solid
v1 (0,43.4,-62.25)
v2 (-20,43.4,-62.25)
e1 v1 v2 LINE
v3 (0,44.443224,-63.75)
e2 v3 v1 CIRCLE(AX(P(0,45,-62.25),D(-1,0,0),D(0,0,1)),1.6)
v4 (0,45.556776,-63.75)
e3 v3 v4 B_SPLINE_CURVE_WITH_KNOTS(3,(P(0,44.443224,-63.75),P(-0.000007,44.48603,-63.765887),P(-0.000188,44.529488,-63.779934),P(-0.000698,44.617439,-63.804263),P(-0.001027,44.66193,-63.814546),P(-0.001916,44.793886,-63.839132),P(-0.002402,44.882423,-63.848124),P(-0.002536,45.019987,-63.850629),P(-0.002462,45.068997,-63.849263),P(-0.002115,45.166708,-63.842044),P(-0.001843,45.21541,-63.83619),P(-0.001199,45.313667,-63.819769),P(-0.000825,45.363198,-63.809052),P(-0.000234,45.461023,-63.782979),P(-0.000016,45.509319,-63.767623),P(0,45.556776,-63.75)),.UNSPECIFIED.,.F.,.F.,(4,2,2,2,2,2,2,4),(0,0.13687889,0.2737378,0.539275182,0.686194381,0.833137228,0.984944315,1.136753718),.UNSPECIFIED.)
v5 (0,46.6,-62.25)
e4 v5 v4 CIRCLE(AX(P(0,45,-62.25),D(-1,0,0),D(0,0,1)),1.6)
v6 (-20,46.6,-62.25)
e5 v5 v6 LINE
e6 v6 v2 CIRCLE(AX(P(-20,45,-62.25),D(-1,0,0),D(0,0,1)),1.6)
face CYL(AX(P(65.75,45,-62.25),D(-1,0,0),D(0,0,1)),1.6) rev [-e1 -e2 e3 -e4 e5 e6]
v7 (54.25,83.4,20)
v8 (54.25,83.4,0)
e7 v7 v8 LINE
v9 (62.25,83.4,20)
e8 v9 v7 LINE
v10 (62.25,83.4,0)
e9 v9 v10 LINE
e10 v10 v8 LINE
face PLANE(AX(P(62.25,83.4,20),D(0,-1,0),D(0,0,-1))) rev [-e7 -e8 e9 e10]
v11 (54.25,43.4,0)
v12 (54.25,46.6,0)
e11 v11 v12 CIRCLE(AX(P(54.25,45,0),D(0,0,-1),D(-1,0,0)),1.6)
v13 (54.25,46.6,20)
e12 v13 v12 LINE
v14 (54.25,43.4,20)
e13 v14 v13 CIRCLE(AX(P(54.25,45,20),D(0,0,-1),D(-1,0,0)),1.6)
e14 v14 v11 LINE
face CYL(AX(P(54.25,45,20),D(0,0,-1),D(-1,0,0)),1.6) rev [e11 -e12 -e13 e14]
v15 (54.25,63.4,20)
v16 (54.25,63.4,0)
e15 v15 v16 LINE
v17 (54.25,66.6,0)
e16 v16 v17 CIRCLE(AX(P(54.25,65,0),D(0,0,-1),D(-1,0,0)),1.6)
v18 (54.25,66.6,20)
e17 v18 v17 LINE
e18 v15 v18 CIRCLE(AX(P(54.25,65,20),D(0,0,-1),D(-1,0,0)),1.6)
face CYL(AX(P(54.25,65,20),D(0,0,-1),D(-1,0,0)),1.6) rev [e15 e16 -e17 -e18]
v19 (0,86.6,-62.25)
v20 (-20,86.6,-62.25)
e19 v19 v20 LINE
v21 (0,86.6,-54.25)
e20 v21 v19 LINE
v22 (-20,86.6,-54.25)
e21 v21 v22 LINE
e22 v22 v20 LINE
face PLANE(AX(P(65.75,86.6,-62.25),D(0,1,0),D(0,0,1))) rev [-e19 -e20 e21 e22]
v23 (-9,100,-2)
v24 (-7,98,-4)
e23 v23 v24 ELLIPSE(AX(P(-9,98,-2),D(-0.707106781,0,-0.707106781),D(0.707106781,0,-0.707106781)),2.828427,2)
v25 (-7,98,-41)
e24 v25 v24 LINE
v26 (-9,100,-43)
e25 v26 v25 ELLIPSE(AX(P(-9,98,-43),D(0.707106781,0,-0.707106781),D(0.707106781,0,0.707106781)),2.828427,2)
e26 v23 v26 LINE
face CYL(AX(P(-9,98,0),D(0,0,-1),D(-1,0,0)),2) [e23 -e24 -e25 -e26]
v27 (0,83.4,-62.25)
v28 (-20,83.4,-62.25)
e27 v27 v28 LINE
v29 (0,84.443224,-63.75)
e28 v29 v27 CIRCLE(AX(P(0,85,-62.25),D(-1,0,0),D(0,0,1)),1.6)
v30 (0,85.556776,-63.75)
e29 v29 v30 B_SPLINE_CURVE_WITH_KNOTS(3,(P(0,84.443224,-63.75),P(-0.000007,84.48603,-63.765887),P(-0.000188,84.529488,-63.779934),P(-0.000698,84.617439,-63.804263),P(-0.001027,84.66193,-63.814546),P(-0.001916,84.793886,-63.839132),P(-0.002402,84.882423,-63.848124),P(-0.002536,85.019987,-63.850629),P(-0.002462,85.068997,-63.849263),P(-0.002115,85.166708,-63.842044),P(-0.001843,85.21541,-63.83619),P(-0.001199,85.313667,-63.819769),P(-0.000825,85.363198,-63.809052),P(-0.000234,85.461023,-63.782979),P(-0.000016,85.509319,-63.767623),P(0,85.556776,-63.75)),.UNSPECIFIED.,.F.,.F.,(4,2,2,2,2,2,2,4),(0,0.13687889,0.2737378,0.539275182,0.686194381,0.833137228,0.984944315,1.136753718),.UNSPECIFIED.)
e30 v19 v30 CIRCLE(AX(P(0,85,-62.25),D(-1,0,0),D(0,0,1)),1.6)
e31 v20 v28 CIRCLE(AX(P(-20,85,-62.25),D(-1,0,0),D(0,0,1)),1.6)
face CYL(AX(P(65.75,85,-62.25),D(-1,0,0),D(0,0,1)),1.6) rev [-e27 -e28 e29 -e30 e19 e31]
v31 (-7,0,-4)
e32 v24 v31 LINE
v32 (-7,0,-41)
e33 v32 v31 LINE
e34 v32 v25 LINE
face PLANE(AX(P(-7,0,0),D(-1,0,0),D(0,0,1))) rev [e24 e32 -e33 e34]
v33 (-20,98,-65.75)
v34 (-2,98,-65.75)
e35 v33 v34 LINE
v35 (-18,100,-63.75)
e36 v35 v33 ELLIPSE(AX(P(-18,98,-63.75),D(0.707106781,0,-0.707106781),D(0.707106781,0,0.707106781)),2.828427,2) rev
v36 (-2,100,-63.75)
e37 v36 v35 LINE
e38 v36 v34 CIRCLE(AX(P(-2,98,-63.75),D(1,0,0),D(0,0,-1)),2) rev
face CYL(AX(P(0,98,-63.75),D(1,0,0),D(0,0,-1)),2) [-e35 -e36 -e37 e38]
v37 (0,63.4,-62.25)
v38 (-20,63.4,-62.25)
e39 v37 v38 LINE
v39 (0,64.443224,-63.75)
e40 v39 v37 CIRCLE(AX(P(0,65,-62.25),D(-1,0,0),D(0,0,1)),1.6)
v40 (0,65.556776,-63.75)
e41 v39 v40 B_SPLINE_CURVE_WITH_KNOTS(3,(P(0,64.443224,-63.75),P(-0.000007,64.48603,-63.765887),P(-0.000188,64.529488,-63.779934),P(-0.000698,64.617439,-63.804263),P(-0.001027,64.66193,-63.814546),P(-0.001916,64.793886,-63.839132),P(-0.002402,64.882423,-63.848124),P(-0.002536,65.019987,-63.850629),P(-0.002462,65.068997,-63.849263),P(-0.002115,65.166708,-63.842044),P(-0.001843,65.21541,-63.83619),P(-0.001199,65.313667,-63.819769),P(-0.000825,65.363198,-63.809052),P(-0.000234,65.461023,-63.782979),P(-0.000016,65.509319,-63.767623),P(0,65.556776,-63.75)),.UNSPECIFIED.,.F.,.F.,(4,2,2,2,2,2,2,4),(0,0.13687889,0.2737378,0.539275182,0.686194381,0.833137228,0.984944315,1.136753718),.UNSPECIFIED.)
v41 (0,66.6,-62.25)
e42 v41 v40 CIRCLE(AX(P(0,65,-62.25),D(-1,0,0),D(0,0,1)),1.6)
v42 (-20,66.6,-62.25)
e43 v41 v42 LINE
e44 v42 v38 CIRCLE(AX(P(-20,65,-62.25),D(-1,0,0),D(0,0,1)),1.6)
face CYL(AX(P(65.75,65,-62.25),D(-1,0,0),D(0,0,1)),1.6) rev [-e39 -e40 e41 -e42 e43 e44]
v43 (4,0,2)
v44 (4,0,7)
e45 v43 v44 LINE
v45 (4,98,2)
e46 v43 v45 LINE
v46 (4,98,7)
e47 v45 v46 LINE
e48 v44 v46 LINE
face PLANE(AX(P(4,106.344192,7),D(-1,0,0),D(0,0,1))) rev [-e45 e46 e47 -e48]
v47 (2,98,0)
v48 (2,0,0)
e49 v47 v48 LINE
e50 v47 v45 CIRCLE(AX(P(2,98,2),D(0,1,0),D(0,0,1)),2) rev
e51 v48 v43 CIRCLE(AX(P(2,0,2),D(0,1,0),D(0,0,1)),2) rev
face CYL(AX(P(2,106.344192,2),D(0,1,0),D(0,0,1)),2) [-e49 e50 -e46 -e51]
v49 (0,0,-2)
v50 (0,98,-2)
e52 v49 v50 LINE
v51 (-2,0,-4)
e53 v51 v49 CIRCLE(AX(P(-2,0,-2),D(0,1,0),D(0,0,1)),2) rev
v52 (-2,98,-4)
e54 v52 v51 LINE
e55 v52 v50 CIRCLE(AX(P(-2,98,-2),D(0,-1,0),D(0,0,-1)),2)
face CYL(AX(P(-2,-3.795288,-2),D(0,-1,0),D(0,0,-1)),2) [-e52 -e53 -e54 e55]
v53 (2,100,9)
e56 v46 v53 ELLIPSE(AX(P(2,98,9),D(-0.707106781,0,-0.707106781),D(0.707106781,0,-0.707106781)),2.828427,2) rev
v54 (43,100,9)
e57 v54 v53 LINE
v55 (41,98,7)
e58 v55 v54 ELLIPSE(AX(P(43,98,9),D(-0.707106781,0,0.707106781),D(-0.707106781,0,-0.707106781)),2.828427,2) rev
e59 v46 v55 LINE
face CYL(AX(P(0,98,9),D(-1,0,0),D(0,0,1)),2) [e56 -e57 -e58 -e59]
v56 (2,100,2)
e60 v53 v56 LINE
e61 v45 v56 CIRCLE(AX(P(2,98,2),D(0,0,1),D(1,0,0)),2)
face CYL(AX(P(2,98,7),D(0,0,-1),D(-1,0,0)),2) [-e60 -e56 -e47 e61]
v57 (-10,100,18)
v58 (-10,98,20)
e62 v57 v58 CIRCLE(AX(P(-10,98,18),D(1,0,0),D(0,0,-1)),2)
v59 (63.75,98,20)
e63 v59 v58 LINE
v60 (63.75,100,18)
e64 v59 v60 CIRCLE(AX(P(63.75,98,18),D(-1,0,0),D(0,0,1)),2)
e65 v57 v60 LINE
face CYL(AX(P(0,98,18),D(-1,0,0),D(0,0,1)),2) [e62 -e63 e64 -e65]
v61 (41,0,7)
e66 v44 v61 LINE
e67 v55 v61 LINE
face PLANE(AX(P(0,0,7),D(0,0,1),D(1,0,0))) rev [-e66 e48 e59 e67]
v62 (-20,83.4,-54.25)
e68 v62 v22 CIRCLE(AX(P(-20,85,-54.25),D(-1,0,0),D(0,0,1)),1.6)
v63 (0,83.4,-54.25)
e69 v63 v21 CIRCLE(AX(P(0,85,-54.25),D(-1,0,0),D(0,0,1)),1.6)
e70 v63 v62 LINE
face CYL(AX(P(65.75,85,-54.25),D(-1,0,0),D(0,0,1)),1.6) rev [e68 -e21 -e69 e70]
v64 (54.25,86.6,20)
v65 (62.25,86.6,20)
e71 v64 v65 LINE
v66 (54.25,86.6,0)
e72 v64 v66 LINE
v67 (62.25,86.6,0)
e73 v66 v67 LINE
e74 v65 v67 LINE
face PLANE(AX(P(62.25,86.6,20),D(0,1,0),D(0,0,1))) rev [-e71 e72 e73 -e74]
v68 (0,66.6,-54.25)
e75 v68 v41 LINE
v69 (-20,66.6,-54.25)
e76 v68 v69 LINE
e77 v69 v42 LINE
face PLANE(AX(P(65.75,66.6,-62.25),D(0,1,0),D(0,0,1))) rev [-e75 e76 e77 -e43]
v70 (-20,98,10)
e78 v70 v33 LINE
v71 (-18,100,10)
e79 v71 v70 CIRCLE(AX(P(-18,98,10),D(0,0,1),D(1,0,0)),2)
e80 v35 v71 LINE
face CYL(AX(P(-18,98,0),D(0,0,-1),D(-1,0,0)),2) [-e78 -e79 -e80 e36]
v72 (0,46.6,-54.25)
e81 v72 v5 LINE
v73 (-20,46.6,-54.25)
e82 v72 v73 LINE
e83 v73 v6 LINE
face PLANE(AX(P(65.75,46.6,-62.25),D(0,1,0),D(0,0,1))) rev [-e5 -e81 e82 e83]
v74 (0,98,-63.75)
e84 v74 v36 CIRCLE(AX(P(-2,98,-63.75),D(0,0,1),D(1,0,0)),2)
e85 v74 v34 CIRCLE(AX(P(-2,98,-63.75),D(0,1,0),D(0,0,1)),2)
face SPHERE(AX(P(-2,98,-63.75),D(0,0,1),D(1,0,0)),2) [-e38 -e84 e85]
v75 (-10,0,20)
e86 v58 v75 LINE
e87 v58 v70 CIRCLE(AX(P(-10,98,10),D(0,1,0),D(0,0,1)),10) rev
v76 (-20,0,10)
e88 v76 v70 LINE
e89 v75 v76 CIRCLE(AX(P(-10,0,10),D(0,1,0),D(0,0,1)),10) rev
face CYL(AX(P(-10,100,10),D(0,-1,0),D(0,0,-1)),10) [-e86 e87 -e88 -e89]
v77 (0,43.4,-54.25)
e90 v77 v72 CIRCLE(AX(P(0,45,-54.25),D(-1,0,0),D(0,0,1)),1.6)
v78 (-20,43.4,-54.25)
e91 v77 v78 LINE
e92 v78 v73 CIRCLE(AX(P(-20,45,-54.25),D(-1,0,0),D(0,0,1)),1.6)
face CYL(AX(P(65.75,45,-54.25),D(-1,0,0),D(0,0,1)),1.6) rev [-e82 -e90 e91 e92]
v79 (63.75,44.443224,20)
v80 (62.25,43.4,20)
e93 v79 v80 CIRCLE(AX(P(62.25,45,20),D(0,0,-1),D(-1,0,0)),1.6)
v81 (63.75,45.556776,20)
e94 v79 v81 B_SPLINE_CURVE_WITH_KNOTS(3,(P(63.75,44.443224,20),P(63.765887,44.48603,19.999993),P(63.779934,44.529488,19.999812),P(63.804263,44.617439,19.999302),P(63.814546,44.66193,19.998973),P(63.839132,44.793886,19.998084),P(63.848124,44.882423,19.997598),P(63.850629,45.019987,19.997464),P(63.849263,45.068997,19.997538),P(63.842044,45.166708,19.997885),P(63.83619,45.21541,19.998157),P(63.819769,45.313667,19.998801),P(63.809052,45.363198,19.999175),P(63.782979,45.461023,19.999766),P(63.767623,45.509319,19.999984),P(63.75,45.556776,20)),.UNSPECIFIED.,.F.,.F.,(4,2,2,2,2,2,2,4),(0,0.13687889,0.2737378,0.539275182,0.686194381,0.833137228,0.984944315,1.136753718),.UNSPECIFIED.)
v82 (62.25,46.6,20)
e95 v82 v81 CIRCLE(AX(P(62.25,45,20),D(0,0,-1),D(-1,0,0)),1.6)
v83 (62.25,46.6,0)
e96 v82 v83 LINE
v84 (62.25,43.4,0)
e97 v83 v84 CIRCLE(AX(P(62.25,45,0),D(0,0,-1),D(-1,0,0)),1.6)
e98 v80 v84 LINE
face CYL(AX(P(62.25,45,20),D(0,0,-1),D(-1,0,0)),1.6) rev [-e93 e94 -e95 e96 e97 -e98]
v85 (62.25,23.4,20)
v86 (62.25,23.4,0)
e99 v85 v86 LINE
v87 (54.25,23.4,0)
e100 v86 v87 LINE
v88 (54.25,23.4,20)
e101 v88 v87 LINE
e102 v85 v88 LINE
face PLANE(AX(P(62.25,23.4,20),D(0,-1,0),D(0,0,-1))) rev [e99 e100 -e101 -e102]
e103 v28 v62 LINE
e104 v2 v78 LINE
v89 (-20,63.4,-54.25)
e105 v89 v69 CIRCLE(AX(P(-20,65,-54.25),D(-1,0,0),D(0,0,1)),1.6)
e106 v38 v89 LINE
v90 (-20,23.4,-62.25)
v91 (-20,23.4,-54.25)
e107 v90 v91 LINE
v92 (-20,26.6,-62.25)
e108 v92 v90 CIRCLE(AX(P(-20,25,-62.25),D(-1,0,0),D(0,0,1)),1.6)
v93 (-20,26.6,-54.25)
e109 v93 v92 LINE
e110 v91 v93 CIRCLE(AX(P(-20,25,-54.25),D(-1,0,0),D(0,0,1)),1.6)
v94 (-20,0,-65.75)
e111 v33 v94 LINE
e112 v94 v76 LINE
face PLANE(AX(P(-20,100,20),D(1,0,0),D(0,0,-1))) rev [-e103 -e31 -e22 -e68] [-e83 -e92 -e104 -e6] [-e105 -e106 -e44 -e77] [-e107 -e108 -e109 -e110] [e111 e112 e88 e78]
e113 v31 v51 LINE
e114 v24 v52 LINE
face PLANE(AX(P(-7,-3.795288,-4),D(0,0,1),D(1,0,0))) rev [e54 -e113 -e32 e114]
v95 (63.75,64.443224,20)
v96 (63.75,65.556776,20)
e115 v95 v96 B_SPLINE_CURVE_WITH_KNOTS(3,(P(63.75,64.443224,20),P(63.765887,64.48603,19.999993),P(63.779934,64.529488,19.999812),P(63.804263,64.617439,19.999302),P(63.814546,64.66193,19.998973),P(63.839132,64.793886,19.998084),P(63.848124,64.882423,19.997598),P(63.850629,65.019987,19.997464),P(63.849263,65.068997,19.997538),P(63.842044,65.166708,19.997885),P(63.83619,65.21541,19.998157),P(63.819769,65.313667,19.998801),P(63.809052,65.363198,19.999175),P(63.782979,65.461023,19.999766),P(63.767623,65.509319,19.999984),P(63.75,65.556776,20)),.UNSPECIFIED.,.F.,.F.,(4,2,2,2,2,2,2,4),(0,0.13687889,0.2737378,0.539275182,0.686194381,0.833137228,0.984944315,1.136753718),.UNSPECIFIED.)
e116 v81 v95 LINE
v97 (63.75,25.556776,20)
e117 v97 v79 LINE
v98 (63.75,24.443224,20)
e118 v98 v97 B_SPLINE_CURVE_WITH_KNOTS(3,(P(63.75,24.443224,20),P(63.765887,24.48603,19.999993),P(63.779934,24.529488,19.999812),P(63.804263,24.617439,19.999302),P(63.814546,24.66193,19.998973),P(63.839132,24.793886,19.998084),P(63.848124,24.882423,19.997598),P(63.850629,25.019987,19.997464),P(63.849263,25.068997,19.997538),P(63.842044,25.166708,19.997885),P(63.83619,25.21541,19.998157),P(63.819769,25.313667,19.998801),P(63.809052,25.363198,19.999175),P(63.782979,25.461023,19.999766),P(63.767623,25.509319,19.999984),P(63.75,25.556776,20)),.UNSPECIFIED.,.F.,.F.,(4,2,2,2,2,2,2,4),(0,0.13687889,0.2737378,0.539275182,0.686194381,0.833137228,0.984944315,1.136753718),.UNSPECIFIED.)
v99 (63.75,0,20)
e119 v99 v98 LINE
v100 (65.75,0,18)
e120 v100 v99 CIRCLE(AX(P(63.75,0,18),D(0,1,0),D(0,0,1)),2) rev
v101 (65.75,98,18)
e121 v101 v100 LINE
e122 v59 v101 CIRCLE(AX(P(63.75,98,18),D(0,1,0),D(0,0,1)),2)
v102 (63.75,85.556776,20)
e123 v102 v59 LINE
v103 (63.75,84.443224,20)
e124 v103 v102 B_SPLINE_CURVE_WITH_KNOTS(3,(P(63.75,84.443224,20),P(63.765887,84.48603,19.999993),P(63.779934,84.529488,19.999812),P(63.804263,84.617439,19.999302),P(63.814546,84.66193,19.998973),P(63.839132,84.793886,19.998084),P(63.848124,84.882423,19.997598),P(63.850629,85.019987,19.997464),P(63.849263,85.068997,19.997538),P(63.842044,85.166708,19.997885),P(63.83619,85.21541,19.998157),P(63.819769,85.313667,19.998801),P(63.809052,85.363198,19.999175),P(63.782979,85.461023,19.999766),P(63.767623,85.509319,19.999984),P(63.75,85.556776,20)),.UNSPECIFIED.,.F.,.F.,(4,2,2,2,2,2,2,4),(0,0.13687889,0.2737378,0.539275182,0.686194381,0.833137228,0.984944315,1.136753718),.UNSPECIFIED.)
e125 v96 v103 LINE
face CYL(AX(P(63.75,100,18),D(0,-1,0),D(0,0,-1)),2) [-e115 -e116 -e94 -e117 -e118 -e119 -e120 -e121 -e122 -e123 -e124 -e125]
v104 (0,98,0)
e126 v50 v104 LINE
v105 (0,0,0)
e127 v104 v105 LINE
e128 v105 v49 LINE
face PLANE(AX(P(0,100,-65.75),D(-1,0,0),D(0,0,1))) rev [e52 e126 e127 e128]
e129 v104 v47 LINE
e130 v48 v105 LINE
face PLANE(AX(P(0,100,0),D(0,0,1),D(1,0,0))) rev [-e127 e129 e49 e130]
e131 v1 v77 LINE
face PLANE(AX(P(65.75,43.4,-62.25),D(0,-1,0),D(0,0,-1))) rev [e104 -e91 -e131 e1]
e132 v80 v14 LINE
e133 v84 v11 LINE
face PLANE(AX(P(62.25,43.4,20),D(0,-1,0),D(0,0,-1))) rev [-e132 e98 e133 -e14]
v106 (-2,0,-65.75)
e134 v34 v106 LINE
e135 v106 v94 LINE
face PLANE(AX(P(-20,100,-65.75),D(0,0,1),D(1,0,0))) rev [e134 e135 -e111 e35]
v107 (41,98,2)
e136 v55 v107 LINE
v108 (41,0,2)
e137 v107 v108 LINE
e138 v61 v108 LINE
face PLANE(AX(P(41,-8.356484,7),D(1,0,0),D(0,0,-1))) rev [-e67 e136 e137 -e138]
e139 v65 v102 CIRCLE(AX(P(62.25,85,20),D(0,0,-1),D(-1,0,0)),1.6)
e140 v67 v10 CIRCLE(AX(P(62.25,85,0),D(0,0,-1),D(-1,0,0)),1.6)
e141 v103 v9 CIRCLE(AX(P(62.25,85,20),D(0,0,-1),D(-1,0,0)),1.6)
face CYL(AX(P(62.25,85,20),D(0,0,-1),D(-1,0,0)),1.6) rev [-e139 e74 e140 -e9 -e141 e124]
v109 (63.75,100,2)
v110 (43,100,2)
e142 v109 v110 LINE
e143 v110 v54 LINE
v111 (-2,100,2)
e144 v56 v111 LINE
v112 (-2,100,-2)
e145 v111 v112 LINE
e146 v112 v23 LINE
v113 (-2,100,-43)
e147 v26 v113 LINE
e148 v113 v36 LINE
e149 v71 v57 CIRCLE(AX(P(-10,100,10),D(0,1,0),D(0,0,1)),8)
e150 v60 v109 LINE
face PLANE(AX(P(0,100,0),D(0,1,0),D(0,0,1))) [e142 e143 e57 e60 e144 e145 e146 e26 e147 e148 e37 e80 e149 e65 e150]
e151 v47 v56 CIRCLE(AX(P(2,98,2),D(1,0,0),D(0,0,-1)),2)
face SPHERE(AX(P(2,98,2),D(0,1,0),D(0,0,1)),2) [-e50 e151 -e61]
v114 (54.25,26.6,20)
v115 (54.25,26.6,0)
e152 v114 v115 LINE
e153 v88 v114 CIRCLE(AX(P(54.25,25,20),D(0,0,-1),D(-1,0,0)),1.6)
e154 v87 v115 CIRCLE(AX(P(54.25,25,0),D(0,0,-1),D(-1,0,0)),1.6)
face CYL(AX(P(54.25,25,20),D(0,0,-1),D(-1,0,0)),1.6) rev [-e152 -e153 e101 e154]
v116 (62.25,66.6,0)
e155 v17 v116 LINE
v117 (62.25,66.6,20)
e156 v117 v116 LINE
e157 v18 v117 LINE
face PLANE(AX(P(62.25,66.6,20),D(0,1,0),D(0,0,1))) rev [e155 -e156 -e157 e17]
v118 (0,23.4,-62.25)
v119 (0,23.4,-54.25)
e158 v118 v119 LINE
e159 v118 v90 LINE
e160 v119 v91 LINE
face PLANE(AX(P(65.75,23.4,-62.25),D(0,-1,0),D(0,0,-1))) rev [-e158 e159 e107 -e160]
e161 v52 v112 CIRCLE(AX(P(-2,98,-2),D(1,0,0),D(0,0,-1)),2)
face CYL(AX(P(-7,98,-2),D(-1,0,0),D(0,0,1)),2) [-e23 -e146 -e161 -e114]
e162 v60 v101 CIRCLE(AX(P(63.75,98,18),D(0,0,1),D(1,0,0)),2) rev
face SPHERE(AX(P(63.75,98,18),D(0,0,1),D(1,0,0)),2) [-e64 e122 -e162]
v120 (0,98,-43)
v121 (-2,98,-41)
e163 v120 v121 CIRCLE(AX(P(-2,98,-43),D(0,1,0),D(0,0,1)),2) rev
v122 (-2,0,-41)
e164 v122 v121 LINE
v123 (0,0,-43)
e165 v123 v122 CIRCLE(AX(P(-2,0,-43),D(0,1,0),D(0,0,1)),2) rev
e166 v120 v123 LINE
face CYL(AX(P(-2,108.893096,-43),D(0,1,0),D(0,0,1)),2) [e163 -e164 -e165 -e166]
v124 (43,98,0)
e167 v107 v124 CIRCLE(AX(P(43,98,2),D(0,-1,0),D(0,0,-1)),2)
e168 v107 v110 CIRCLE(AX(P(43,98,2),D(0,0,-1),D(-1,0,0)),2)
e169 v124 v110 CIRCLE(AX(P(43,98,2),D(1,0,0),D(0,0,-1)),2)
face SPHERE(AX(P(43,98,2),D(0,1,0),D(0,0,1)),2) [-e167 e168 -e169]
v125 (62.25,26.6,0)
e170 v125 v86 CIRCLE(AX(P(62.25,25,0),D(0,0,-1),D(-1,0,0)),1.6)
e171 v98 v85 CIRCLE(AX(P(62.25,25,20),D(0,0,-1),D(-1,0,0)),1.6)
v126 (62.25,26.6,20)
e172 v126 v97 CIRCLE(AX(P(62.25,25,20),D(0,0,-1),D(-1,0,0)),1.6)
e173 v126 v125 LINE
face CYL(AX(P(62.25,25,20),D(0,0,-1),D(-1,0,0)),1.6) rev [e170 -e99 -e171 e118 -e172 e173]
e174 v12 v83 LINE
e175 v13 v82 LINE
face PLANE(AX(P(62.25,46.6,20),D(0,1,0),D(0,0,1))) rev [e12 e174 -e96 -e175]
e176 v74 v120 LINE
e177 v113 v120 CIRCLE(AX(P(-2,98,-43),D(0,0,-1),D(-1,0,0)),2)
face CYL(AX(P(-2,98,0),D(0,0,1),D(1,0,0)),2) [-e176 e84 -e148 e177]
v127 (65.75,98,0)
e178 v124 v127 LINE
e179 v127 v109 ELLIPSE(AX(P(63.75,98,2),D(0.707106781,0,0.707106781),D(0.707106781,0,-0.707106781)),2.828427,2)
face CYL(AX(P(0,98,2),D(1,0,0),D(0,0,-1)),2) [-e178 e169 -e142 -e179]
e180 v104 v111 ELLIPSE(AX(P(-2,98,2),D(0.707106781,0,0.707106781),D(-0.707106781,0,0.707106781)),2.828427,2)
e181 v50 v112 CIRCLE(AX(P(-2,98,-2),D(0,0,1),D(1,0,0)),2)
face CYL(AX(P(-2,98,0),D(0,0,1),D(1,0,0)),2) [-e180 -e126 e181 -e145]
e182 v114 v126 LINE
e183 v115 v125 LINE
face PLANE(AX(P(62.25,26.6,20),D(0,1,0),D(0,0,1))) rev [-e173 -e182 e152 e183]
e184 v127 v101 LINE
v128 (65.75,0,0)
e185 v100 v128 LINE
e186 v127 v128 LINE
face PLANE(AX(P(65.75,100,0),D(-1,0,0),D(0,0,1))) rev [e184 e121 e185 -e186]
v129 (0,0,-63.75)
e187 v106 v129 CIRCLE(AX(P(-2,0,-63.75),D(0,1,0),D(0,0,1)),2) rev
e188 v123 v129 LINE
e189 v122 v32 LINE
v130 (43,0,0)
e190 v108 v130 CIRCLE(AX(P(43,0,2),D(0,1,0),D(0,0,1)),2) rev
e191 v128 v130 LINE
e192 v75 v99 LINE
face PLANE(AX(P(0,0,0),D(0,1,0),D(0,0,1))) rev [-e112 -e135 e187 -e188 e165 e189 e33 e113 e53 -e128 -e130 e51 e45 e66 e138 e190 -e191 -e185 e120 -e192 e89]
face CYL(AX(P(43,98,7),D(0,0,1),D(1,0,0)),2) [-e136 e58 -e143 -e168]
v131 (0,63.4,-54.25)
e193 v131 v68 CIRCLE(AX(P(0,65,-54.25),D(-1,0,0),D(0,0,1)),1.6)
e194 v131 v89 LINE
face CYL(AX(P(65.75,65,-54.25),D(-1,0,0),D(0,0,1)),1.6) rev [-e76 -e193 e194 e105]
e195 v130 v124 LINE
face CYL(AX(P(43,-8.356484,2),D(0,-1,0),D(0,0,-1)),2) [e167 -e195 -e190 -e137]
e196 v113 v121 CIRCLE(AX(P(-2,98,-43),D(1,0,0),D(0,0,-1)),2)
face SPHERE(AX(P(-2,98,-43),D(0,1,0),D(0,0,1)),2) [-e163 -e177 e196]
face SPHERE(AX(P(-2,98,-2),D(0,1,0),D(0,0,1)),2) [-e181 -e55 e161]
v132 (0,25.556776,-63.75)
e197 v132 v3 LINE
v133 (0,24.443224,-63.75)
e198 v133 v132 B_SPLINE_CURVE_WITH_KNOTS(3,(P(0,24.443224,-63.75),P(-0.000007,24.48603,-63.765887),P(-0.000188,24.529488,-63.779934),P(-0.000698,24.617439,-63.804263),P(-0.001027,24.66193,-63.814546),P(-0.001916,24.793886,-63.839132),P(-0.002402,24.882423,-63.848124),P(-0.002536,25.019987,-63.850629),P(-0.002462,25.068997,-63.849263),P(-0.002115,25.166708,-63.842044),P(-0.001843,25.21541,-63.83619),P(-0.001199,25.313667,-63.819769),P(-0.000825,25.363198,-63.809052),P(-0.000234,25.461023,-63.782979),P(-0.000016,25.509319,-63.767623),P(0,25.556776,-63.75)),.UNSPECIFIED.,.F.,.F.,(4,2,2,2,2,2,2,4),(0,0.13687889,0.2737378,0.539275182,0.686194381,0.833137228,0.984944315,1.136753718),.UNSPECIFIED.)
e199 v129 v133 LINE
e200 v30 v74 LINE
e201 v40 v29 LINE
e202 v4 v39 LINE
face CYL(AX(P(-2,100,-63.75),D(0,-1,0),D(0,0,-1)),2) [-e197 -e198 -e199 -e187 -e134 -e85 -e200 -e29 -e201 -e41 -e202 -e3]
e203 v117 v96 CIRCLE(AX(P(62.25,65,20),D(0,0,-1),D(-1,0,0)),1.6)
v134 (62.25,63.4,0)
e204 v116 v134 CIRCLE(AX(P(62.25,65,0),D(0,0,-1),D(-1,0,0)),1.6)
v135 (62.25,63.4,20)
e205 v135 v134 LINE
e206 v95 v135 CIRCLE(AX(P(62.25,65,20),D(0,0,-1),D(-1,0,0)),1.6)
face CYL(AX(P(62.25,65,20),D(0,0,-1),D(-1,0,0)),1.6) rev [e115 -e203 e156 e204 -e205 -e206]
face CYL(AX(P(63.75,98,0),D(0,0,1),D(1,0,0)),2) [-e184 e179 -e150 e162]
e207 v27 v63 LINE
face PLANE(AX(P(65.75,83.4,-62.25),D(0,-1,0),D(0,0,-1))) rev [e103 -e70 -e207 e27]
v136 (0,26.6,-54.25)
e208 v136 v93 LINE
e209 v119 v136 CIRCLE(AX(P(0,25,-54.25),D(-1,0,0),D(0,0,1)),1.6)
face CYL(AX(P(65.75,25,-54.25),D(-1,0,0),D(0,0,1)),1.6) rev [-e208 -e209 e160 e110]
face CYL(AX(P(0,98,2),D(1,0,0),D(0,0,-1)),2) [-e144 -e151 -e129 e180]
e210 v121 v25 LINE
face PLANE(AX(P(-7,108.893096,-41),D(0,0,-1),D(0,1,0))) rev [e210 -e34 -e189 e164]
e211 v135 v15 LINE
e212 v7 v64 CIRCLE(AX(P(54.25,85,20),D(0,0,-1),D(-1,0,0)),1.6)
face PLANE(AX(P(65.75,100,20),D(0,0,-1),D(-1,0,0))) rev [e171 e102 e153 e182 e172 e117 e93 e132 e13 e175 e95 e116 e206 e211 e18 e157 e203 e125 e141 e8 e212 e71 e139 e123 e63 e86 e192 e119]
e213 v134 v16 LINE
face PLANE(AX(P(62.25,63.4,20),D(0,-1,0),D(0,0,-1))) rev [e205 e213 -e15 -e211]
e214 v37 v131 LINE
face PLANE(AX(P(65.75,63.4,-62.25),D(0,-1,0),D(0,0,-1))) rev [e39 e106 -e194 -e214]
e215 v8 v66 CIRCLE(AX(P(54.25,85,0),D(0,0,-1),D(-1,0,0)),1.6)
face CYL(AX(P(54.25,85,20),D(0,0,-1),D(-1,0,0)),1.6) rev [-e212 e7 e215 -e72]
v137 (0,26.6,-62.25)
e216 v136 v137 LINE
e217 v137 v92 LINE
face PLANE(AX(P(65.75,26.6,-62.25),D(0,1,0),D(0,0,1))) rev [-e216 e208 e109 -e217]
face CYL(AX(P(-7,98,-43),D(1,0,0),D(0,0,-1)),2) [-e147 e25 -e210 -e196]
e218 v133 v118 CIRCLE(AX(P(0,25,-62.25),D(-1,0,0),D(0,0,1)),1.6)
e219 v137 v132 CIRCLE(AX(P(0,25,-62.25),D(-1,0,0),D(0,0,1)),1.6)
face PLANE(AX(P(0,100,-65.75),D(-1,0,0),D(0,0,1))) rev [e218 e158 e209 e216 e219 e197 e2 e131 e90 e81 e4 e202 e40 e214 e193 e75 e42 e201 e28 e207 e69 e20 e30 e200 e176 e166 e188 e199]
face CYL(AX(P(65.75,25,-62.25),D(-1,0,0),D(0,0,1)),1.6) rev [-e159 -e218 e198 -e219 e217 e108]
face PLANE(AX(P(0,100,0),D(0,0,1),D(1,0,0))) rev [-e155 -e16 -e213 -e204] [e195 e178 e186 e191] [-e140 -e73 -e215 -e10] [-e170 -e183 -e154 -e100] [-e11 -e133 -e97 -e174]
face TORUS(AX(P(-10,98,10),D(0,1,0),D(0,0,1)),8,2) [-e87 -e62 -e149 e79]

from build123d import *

# Parameters (mm, degrees)
BOSS_EXTRUDE1_DEPTH = 100
SKETCH2_W           = 37
SKETCH2_H           = 112.688383797
CUT_EXTRUDE1_DEPTH  = 7
SKETCH3_W           = 37
SKETCH3_H           = 114.700676364
CUT_EXTRUDE2_DEPTH  = 7
CUT_EXTRUDE3_DEPTH  = 148.228139294
CUT_EXTRUDE4_DEPTH  = 137.550814717
FILLET1_R           = 10
FILLET2_R           = 2
FILLET3_R           = 2
FILLET4_R           = 2


with BuildPart() as part:
    # Sketch1 → Boss-Extrude1 (new body)
    with BuildSketch(Plane(origin=(0, 0, 0), x_dir=(1, 0, 0), z_dir=(0, 1, 0))):
        Polygon((0, 0), (65.75, 0), (65.75, -20), (-20, -20), (-20, 65.75), (0, 65.75), align=None)
    extrude(amount=BOSS_EXTRUDE1_DEPTH)

    # Sketch2 → Cut-Extrude1 (cut)
    with BuildSketch(Plane(origin=(0, 0, 0), x_dir=(0, 0, -1), z_dir=(1, 0, 0))):
        with Locations((22.5, 52.54890392)):
            Rectangle(SKETCH2_W, SKETCH2_H)
    extrude(amount=-CUT_EXTRUDE1_DEPTH, mode=Mode.SUBTRACT)

    # Sketch3 → Cut-Extrude2 (cut)
    with BuildSketch(Plane(origin=(0, 0, 0), x_dir=(-1, 0, 0), z_dir=(0, 0, -1))):
        with Locations((-22.5, 48.993853716)):
            Rectangle(SKETCH3_W, SKETCH3_H)
    extrude(amount=-CUT_EXTRUDE2_DEPTH, mode=Mode.SUBTRACT)

    # Sketch4 → Cut-Extrude3 (cut, through all)
    with BuildSketch(Plane.ZY.offset(20)):
        with BuildLine():
            Line((-62.25, 86.6), (-54.25, 86.6))
            ThreePointArc((-54.25, 86.6), (-52.65, 85), (-54.25, 83.4))
            Line((-54.25, 83.4), (-62.25, 83.4))
            ThreePointArc((-62.25, 83.4), (-63.85, 85), (-62.25, 86.6))
        make_face()
        with BuildLine():
            Line((-62.25, 66.6), (-54.25, 66.6))
            ThreePointArc((-54.25, 66.6), (-52.65, 65), (-54.25, 63.4))
            Line((-54.25, 63.4), (-62.25, 63.4))
            ThreePointArc((-62.25, 63.4), (-63.85, 65), (-62.25, 66.6))
        make_face()
        with BuildLine():
            Line((-62.25, 46.6), (-54.25, 46.6))
            ThreePointArc((-54.25, 46.6), (-52.65, 45), (-54.25, 43.4))
            Line((-54.25, 43.4), (-62.25, 43.4))
            ThreePointArc((-62.25, 43.4), (-63.85, 45), (-62.25, 46.6))
        make_face()
        with BuildLine():
            Line((-62.25, 26.6), (-54.25, 26.6))
            ThreePointArc((-54.25, 26.6), (-52.65, 25), (-54.25, 23.4))
            Line((-54.25, 23.4), (-62.25, 23.4))
            ThreePointArc((-62.25, 23.4), (-63.85, 25), (-62.25, 26.6))
        make_face()
    extrude(amount=-CUT_EXTRUDE3_DEPTH, mode=Mode.SUBTRACT)

    # Sketch6 → Cut-Extrude4 (cut, through all)
    with BuildSketch(Plane(origin=(0, 0, 0), x_dir=(-1, 0, 0), z_dir=(0, 0, -1))):
        with BuildLine():
            Line((-62.25, 86.6), (-54.25, 86.6))
            ThreePointArc((-54.25, 86.6), (-52.65, 85), (-54.25, 83.4))
            Line((-54.25, 83.4), (-62.25, 83.4))
            ThreePointArc((-62.25, 83.4), (-63.85, 85), (-62.25, 86.6))
        make_face()
        with BuildLine():
            Line((-62.25, 66.6), (-54.25, 66.6))
            ThreePointArc((-54.25, 66.6), (-52.65, 65), (-54.25, 63.4))
            Line((-54.25, 63.4), (-62.25, 63.4))
            ThreePointArc((-62.25, 63.4), (-63.85, 65), (-62.25, 66.6))
        make_face()
        with BuildLine():
            Line((-62.25, 46.6), (-54.25, 46.6))
            ThreePointArc((-54.25, 46.6), (-52.65, 45), (-54.25, 43.4))
            Line((-54.25, 43.4), (-62.25, 43.4))
            ThreePointArc((-62.25, 43.4), (-63.85, 45), (-62.25, 46.6))
        make_face()
        with BuildLine():
            Line((-62.25, 26.6), (-54.25, 26.6))
            ThreePointArc((-54.25, 26.6), (-52.65, 25), (-54.25, 23.4))
            Line((-54.25, 23.4), (-62.25, 23.4))
            ThreePointArc((-62.25, 23.4), (-63.85, 25), (-62.25, 26.6))
        make_face()
    extrude(amount=-CUT_EXTRUDE4_DEPTH, mode=Mode.SUBTRACT)

    # Fillet1
    fillet1_edges = [part.edges().sort_by_distance(p)[0] for p in [
        (-20, 50, 20),
    ]]
    fillet(fillet1_edges, radius=FILLET1_R)

    # Fillet2
    fillet2_edges = [part.edges().sort_by_distance(p)[0] for p in [
        (0, 50, -41),
        (0, 50, -4),
        (4, 50, 0),
        (41, 50, 0),
    ]]
    fillet(fillet2_edges, radius=FILLET2_R)

    # Fillet3
    fillet3_edges = [part.edges().sort_by_distance(p)[0] for p in [
        (-20, 100, -27.875),
        (65.75, 100, 10),
        (27.875, 100, 20),
        (-17.071067812, 100, 17.071067812),
        (4, 100, 4.5),
        (1, 100, 0),
        (-4.5, 100, -41),
        (0, 100, -54.375),
        (-0.585786438, 100, -3.414213562),
        (-0.585786438, 100, -41.585786438),
        (3.414213562, 100, 0.585786438),
        (41.585786438, 100, 0.585786438),
        (54.375, 100, 0),
        (-4.5, 100, -4),
        (-7, 100, -22.5),
        (0, 100, -1),
        (41, 100, 4.5),
        (22.5, 100, 7),
        (-10, 100, -65.75),
    ]]
    fillet(fillet3_edges, radius=FILLET3_R)

    # Fillet4
    # the kernel refuses this fillet: 2 mm, written as the material it takes off along each edge
    with BuildSketch(Plane(origin=(-2, 98, -63.75), x_dir=(0, 0, -1), z_dir=(1, 0, 0))) as fillet4_piece_1_section:
        Polygon((0, 0), (FILLET4_R, 0), (FILLET4_R, FILLET4_R), (0, FILLET4_R), align=None)
    fillet4_piece_1 = extrude(amount=FILLET4_R, mode=Mode.PRIVATE)
    fillet4_piece_1 = fillet4_piece_1 - Plane(origin=(-2, 98, -63.75), x_dir=(0, -0.7071067811865475, 0.7071067811865475), z_dir=(1, 0, 0)) * Sphere(FILLET4_R, mode=Mode.PRIVATE)
    add(fillet4_piece_1, mode=Mode.SUBTRACT)
    with BuildSketch(Plane(origin=(63.75, 98, 18), x_dir=(1, 0, 0), z_dir=(0, 0, 1))) as fillet4_piece_2_section:
        Polygon((0, 0), (FILLET4_R, 0), (FILLET4_R, FILLET4_R), (0, FILLET4_R), align=None)
    fillet4_piece_2 = extrude(amount=FILLET4_R, mode=Mode.PRIVATE)
    fillet4_piece_2 = fillet4_piece_2 - Plane(origin=(63.75, 98, 18), x_dir=(-0.7071067811865475, -0.7071067811865475, 0), z_dir=(0, 0, 1)) * Sphere(FILLET4_R, mode=Mode.PRIVATE)
    add(fillet4_piece_2, mode=Mode.SUBTRACT)
    with BuildSketch(Plane(origin=(65.75, -5, 20), x_dir=(-1, 0, 0), z_dir=(0, 1, 0)), Plane(origin=(0, -5, -65.75), x_dir=(0, 0, 1), z_dir=(0, 1, 0))) as fillet4_piece_3:
        with BuildLine():
            CenterArc((FILLET4_R, -FILLET4_R), FILLET4_R, 90, 90)
            Line((0, -FILLET4_R), (0, 0))
            Line((0, 0), (FILLET4_R, 0))
        make_face()
    extrude(amount=103, mode=Mode.SUBTRACT)


solid = part.part
